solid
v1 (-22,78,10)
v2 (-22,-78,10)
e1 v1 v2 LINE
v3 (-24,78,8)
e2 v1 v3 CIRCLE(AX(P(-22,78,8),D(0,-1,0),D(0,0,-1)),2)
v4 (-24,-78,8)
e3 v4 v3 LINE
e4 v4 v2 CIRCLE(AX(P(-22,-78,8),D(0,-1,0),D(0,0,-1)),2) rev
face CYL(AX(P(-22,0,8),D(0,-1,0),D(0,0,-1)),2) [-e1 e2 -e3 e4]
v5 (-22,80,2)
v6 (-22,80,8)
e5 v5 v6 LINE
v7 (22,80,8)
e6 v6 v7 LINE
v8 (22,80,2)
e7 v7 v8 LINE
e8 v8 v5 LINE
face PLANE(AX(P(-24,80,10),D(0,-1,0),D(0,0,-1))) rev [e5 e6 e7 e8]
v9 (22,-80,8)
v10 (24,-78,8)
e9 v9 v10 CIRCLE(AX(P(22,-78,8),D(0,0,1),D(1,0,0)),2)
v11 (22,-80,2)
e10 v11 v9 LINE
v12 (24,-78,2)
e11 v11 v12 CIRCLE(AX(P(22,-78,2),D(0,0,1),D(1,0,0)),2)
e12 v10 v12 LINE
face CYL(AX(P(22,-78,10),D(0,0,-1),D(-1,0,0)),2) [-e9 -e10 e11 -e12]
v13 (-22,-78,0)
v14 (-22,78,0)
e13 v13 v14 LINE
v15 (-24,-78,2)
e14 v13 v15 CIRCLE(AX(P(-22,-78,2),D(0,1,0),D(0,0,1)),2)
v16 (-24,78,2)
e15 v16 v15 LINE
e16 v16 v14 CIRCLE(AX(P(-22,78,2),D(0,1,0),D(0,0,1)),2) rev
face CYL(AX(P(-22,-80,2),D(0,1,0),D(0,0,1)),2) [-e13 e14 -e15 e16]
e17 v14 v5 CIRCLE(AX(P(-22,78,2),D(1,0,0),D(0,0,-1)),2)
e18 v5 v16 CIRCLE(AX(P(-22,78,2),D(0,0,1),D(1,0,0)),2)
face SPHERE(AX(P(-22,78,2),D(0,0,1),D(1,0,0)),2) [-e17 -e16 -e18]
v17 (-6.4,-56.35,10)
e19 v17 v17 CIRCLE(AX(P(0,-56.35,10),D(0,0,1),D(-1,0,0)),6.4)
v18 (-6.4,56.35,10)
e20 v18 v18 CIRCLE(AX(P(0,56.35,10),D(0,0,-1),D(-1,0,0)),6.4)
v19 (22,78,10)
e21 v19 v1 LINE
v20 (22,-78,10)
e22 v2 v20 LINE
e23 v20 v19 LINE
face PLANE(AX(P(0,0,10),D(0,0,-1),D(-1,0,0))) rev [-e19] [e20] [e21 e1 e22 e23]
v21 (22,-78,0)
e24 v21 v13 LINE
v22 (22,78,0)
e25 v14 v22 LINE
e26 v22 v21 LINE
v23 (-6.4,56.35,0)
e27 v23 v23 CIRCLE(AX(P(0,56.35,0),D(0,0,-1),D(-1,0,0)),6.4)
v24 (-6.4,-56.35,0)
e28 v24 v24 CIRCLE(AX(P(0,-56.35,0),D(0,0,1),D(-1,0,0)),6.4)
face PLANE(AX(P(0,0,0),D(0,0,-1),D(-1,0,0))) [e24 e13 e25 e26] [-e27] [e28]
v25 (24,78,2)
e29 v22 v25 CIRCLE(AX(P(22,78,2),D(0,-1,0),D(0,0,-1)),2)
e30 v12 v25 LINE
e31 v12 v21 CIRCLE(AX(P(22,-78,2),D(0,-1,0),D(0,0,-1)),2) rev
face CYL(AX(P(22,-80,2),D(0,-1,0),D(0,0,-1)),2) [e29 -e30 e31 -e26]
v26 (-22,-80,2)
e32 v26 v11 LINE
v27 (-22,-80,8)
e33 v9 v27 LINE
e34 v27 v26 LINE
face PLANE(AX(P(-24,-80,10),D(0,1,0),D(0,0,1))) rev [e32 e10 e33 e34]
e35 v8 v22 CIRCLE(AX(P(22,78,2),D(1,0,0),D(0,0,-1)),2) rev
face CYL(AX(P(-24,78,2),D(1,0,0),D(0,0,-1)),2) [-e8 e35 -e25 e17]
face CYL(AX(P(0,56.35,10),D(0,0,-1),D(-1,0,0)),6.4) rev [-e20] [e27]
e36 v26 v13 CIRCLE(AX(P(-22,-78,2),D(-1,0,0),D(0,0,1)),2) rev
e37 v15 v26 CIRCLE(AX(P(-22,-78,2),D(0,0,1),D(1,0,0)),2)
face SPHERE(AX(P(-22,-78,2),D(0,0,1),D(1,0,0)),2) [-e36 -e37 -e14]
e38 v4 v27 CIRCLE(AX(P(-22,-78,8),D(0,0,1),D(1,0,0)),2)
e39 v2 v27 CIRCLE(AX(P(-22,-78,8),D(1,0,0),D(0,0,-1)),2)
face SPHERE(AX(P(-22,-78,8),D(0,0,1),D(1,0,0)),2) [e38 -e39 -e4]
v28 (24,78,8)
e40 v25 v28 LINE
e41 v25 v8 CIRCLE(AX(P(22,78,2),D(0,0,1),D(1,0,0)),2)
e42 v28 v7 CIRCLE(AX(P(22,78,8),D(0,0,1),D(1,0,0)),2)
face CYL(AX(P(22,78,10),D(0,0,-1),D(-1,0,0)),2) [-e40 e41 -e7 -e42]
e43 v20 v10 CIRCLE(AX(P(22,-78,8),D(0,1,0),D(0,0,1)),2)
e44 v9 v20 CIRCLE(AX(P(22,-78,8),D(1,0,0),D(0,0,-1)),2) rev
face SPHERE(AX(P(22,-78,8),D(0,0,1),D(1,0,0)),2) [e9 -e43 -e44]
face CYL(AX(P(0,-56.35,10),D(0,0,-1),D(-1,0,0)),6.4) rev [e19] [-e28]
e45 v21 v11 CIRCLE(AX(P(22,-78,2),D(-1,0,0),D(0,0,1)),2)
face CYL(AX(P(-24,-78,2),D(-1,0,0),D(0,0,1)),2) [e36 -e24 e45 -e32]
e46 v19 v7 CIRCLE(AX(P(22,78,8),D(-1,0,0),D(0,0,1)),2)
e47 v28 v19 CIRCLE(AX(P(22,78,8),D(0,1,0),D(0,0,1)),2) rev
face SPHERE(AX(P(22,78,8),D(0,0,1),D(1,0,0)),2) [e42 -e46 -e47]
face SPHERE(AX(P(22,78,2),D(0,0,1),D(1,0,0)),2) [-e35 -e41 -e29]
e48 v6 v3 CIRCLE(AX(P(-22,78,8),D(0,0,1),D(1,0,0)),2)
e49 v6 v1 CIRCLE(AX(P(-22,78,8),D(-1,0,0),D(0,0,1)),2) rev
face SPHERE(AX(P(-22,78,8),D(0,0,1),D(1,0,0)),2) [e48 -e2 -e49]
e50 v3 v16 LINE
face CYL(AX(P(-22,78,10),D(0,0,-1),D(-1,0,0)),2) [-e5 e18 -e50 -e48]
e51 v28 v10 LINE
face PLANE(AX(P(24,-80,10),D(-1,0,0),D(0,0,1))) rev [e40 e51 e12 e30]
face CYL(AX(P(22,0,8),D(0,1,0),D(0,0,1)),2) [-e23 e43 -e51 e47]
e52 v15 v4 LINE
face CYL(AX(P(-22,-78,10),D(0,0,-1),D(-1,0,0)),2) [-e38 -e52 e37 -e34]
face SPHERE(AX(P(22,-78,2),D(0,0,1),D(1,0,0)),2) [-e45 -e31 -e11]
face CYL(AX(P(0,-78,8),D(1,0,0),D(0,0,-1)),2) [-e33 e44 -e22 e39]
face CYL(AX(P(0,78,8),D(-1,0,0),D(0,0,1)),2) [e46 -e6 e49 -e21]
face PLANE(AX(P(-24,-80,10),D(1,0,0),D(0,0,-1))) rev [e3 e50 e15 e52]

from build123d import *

# Parameters (mm, degrees)
SKETCH1_W           = 48
SKETCH1_H           = 160
BOSS_EXTRUDE1_DEPTH = 10
FILLET1_R           = 2
FILLET2_R           = 2
SKETCH2_R           = 6.4
CUT_EXTRUDE1_DEPTH  = 85.118963379


with BuildPart() as part:
    # Sketch1 → Boss-Extrude1 (new body)
    with BuildSketch(Plane.XY):
        Rectangle(SKETCH1_W, SKETCH1_H)
    extrude(amount=BOSS_EXTRUDE1_DEPTH)

    # Fillet1
    fillet1_edges = [part.edges().sort_by_distance(p)[0] for p in [
        (-24, 0, 10),
        (0, -80, 10),
        (24, 0, 10),
        (0, -80, 0),
        (-24, 0, 0),
        (0, 80, 0),
        (24, 0, 0),
        (0, 80, 10),
    ]]
    fillet(fillet1_edges, radius=FILLET1_R)

    # Fillet2
    # the kernel refuses this fillet: 2 mm, written as the material it takes off along each edge
    with BuildSketch(Plane(origin=(-22, 78, 8), x_dir=(0, 1, 0), z_dir=(-1, 0, 0))) as fillet2_piece_1_section:
        Polygon((0, 0), (FILLET2_R, 0), (FILLET2_R, -FILLET2_R), (0, -FILLET2_R), align=None)
    fillet2_piece_1 = extrude(amount=FILLET2_R, mode=Mode.PRIVATE)
    fillet2_piece_1 = fillet2_piece_1 - Plane(origin=(-22, 78, 8), x_dir=(0, -0.7071067811865475, -0.7071067811865475), z_dir=(-1, 0, 0)) * Sphere(FILLET2_R, mode=Mode.PRIVATE)
    add(fillet2_piece_1, mode=Mode.SUBTRACT)
    with BuildSketch(Plane(origin=(22, 78, 8), x_dir=(0, 1, 0), z_dir=(1, 0, 0))) as fillet2_piece_2_section:
        Polygon((0, 0), (FILLET2_R, 0), (FILLET2_R, FILLET2_R), (0, FILLET2_R), align=None)
    fillet2_piece_2 = extrude(amount=FILLET2_R, mode=Mode.PRIVATE)
    fillet2_piece_2 = fillet2_piece_2 - Plane(origin=(22, 78, 8), x_dir=(0, -0.7071067811865475, -0.7071067811865475), z_dir=(1, 0, 0)) * Sphere(FILLET2_R, mode=Mode.PRIVATE)
    add(fillet2_piece_2, mode=Mode.SUBTRACT)
    with BuildSketch(Plane(origin=(-22, -78, 8), x_dir=(-1, 0, 0), z_dir=(0, -1, 0))) as fillet2_piece_3_section:
        Polygon((0, 0), (FILLET2_R, 0), (FILLET2_R, -FILLET2_R), (0, -FILLET2_R), align=None)
    fillet2_piece_3 = extrude(amount=FILLET2_R, mode=Mode.PRIVATE)
    fillet2_piece_3 = fillet2_piece_3 - Plane(origin=(-22, -78, 8), x_dir=(0.7071067811865475, 0, -0.7071067811865475), z_dir=(0, -1, 0)) * Sphere(FILLET2_R, mode=Mode.PRIVATE)
    add(fillet2_piece_3, mode=Mode.SUBTRACT)
    with BuildSketch(Plane(origin=(22, -78, 8), x_dir=(1, 0, 0), z_dir=(0, -1, 0))) as fillet2_piece_4_section:
        Polygon((0, 0), (FILLET2_R, 0), (FILLET2_R, FILLET2_R), (0, FILLET2_R), align=None)
    fillet2_piece_4 = extrude(amount=FILLET2_R, mode=Mode.PRIVATE)
    fillet2_piece_4 = fillet2_piece_4 - Plane(origin=(22, -78, 8), x_dir=(-0.7071067811865475, 0, -0.7071067811865475), z_dir=(0, -1, 0)) * Sphere(FILLET2_R, mode=Mode.PRIVATE)
    add(fillet2_piece_4, mode=Mode.SUBTRACT)
    with BuildSketch(Plane(origin=(22, -78, 2), x_dir=(1, 0, 0), z_dir=(0, -1, 0))) as fillet2_piece_5_section:
        Polygon((0, 0), (FILLET2_R, 0), (FILLET2_R, -FILLET2_R), (0, -FILLET2_R), align=None)
    fillet2_piece_5 = extrude(amount=FILLET2_R, mode=Mode.PRIVATE)
    fillet2_piece_5 = fillet2_piece_5 - Plane(origin=(22, -78, 2), x_dir=(-0.7071067811865475, 0, 0.7071067811865475), z_dir=(0, -1, 0)) * Sphere(FILLET2_R, mode=Mode.PRIVATE)
    add(fillet2_piece_5, mode=Mode.SUBTRACT)
    with BuildSketch(Plane(origin=(-22, -78, 2), x_dir=(-1, 0, 0), z_dir=(0, -1, 0))) as fillet2_piece_6_section:
        Polygon((0, 0), (FILLET2_R, 0), (FILLET2_R, FILLET2_R), (0, FILLET2_R), align=None)
    fillet2_piece_6 = extrude(amount=FILLET2_R, mode=Mode.PRIVATE)
    fillet2_piece_6 = fillet2_piece_6 - Plane(origin=(-22, -78, 2), x_dir=(0.7071067811865475, 0, 0.7071067811865475), z_dir=(0, -1, 0)) * Sphere(FILLET2_R, mode=Mode.PRIVATE)
    add(fillet2_piece_6, mode=Mode.SUBTRACT)
    with BuildSketch(Plane(origin=(22, 78, 2), x_dir=(0, 1, 0), z_dir=(1, 0, 0))) as fillet2_piece_7_section:
        Polygon((0, 0), (FILLET2_R, 0), (FILLET2_R, -FILLET2_R), (0, -FILLET2_R), align=None)
    fillet2_piece_7 = extrude(amount=FILLET2_R, mode=Mode.PRIVATE)
    fillet2_piece_7 = fillet2_piece_7 - Plane(origin=(22, 78, 2), x_dir=(0, -0.7071067811865475, 0.7071067811865475), z_dir=(1, 0, 0)) * Sphere(FILLET2_R, mode=Mode.PRIVATE)
    add(fillet2_piece_7, mode=Mode.SUBTRACT)
    with BuildSketch(Plane(origin=(-22, 78, 2), x_dir=(0, 1, 0), z_dir=(-1, 0, 0))) as fillet2_piece_8_section:
        Polygon((0, 0), (FILLET2_R, 0), (FILLET2_R, FILLET2_R), (0, FILLET2_R), align=None)
    fillet2_piece_8 = extrude(amount=FILLET2_R, mode=Mode.PRIVATE)
    fillet2_piece_8 = fillet2_piece_8 - Plane(origin=(-22, 78, 2), x_dir=(0, -0.7071067811865475, 0.7071067811865475), z_dir=(-1, 0, 0)) * Sphere(FILLET2_R, mode=Mode.PRIVATE)
    add(fillet2_piece_8, mode=Mode.SUBTRACT)
    with BuildSketch(Plane(origin=(24, -80, 2), x_dir=(-1, 0, 0), z_dir=(0, 0, 1)), Plane(origin=(24, 80, 2), x_dir=(0, -1, 0), z_dir=(0, 0, 1))) as fillet2_piece_9:
        with BuildLine():
            CenterArc((FILLET2_R, -FILLET2_R), FILLET2_R, 90, 90)
            Line((0, -FILLET2_R), (0, 0))
            Line((0, 0), (FILLET2_R, 0))
        make_face()
    extrude(amount=6, mode=Mode.SUBTRACT)
    with BuildSketch(Plane(origin=(-24, -80, 2), x_dir=(1, 0, 0), z_dir=(0, 0, 1)), Plane(origin=(-24, 80, 2), x_dir=(0, -1, 0), z_dir=(0, 0, 1))) as fillet2_piece_10:
        with BuildLine():
            CenterArc((FILLET2_R, FILLET2_R), FILLET2_R, 180, 90)
            Line((0, FILLET2_R), (0, 0))
            Line((0, 0), (FILLET2_R, 0))
        make_face()
    extrude(amount=6, mode=Mode.SUBTRACT)

    # Sketch2 → Cut-Extrude1 (cut, through all)
    with BuildSketch(Plane(origin=(0, 0, 0), x_dir=(-1, 0, 0), z_dir=(0, 0, -1))):
        with Locations((0, 56.35)):
            Circle(SKETCH2_R)
    cut_extrude1 = extrude(amount=-CUT_EXTRUDE1_DEPTH, mode=Mode.SUBTRACT)

    # Mirror2: Cut-Extrude1 across plane
    add(cut_extrude1.mirror(Plane.ZX), mode=Mode.SUBTRACT)


solid = part.part
